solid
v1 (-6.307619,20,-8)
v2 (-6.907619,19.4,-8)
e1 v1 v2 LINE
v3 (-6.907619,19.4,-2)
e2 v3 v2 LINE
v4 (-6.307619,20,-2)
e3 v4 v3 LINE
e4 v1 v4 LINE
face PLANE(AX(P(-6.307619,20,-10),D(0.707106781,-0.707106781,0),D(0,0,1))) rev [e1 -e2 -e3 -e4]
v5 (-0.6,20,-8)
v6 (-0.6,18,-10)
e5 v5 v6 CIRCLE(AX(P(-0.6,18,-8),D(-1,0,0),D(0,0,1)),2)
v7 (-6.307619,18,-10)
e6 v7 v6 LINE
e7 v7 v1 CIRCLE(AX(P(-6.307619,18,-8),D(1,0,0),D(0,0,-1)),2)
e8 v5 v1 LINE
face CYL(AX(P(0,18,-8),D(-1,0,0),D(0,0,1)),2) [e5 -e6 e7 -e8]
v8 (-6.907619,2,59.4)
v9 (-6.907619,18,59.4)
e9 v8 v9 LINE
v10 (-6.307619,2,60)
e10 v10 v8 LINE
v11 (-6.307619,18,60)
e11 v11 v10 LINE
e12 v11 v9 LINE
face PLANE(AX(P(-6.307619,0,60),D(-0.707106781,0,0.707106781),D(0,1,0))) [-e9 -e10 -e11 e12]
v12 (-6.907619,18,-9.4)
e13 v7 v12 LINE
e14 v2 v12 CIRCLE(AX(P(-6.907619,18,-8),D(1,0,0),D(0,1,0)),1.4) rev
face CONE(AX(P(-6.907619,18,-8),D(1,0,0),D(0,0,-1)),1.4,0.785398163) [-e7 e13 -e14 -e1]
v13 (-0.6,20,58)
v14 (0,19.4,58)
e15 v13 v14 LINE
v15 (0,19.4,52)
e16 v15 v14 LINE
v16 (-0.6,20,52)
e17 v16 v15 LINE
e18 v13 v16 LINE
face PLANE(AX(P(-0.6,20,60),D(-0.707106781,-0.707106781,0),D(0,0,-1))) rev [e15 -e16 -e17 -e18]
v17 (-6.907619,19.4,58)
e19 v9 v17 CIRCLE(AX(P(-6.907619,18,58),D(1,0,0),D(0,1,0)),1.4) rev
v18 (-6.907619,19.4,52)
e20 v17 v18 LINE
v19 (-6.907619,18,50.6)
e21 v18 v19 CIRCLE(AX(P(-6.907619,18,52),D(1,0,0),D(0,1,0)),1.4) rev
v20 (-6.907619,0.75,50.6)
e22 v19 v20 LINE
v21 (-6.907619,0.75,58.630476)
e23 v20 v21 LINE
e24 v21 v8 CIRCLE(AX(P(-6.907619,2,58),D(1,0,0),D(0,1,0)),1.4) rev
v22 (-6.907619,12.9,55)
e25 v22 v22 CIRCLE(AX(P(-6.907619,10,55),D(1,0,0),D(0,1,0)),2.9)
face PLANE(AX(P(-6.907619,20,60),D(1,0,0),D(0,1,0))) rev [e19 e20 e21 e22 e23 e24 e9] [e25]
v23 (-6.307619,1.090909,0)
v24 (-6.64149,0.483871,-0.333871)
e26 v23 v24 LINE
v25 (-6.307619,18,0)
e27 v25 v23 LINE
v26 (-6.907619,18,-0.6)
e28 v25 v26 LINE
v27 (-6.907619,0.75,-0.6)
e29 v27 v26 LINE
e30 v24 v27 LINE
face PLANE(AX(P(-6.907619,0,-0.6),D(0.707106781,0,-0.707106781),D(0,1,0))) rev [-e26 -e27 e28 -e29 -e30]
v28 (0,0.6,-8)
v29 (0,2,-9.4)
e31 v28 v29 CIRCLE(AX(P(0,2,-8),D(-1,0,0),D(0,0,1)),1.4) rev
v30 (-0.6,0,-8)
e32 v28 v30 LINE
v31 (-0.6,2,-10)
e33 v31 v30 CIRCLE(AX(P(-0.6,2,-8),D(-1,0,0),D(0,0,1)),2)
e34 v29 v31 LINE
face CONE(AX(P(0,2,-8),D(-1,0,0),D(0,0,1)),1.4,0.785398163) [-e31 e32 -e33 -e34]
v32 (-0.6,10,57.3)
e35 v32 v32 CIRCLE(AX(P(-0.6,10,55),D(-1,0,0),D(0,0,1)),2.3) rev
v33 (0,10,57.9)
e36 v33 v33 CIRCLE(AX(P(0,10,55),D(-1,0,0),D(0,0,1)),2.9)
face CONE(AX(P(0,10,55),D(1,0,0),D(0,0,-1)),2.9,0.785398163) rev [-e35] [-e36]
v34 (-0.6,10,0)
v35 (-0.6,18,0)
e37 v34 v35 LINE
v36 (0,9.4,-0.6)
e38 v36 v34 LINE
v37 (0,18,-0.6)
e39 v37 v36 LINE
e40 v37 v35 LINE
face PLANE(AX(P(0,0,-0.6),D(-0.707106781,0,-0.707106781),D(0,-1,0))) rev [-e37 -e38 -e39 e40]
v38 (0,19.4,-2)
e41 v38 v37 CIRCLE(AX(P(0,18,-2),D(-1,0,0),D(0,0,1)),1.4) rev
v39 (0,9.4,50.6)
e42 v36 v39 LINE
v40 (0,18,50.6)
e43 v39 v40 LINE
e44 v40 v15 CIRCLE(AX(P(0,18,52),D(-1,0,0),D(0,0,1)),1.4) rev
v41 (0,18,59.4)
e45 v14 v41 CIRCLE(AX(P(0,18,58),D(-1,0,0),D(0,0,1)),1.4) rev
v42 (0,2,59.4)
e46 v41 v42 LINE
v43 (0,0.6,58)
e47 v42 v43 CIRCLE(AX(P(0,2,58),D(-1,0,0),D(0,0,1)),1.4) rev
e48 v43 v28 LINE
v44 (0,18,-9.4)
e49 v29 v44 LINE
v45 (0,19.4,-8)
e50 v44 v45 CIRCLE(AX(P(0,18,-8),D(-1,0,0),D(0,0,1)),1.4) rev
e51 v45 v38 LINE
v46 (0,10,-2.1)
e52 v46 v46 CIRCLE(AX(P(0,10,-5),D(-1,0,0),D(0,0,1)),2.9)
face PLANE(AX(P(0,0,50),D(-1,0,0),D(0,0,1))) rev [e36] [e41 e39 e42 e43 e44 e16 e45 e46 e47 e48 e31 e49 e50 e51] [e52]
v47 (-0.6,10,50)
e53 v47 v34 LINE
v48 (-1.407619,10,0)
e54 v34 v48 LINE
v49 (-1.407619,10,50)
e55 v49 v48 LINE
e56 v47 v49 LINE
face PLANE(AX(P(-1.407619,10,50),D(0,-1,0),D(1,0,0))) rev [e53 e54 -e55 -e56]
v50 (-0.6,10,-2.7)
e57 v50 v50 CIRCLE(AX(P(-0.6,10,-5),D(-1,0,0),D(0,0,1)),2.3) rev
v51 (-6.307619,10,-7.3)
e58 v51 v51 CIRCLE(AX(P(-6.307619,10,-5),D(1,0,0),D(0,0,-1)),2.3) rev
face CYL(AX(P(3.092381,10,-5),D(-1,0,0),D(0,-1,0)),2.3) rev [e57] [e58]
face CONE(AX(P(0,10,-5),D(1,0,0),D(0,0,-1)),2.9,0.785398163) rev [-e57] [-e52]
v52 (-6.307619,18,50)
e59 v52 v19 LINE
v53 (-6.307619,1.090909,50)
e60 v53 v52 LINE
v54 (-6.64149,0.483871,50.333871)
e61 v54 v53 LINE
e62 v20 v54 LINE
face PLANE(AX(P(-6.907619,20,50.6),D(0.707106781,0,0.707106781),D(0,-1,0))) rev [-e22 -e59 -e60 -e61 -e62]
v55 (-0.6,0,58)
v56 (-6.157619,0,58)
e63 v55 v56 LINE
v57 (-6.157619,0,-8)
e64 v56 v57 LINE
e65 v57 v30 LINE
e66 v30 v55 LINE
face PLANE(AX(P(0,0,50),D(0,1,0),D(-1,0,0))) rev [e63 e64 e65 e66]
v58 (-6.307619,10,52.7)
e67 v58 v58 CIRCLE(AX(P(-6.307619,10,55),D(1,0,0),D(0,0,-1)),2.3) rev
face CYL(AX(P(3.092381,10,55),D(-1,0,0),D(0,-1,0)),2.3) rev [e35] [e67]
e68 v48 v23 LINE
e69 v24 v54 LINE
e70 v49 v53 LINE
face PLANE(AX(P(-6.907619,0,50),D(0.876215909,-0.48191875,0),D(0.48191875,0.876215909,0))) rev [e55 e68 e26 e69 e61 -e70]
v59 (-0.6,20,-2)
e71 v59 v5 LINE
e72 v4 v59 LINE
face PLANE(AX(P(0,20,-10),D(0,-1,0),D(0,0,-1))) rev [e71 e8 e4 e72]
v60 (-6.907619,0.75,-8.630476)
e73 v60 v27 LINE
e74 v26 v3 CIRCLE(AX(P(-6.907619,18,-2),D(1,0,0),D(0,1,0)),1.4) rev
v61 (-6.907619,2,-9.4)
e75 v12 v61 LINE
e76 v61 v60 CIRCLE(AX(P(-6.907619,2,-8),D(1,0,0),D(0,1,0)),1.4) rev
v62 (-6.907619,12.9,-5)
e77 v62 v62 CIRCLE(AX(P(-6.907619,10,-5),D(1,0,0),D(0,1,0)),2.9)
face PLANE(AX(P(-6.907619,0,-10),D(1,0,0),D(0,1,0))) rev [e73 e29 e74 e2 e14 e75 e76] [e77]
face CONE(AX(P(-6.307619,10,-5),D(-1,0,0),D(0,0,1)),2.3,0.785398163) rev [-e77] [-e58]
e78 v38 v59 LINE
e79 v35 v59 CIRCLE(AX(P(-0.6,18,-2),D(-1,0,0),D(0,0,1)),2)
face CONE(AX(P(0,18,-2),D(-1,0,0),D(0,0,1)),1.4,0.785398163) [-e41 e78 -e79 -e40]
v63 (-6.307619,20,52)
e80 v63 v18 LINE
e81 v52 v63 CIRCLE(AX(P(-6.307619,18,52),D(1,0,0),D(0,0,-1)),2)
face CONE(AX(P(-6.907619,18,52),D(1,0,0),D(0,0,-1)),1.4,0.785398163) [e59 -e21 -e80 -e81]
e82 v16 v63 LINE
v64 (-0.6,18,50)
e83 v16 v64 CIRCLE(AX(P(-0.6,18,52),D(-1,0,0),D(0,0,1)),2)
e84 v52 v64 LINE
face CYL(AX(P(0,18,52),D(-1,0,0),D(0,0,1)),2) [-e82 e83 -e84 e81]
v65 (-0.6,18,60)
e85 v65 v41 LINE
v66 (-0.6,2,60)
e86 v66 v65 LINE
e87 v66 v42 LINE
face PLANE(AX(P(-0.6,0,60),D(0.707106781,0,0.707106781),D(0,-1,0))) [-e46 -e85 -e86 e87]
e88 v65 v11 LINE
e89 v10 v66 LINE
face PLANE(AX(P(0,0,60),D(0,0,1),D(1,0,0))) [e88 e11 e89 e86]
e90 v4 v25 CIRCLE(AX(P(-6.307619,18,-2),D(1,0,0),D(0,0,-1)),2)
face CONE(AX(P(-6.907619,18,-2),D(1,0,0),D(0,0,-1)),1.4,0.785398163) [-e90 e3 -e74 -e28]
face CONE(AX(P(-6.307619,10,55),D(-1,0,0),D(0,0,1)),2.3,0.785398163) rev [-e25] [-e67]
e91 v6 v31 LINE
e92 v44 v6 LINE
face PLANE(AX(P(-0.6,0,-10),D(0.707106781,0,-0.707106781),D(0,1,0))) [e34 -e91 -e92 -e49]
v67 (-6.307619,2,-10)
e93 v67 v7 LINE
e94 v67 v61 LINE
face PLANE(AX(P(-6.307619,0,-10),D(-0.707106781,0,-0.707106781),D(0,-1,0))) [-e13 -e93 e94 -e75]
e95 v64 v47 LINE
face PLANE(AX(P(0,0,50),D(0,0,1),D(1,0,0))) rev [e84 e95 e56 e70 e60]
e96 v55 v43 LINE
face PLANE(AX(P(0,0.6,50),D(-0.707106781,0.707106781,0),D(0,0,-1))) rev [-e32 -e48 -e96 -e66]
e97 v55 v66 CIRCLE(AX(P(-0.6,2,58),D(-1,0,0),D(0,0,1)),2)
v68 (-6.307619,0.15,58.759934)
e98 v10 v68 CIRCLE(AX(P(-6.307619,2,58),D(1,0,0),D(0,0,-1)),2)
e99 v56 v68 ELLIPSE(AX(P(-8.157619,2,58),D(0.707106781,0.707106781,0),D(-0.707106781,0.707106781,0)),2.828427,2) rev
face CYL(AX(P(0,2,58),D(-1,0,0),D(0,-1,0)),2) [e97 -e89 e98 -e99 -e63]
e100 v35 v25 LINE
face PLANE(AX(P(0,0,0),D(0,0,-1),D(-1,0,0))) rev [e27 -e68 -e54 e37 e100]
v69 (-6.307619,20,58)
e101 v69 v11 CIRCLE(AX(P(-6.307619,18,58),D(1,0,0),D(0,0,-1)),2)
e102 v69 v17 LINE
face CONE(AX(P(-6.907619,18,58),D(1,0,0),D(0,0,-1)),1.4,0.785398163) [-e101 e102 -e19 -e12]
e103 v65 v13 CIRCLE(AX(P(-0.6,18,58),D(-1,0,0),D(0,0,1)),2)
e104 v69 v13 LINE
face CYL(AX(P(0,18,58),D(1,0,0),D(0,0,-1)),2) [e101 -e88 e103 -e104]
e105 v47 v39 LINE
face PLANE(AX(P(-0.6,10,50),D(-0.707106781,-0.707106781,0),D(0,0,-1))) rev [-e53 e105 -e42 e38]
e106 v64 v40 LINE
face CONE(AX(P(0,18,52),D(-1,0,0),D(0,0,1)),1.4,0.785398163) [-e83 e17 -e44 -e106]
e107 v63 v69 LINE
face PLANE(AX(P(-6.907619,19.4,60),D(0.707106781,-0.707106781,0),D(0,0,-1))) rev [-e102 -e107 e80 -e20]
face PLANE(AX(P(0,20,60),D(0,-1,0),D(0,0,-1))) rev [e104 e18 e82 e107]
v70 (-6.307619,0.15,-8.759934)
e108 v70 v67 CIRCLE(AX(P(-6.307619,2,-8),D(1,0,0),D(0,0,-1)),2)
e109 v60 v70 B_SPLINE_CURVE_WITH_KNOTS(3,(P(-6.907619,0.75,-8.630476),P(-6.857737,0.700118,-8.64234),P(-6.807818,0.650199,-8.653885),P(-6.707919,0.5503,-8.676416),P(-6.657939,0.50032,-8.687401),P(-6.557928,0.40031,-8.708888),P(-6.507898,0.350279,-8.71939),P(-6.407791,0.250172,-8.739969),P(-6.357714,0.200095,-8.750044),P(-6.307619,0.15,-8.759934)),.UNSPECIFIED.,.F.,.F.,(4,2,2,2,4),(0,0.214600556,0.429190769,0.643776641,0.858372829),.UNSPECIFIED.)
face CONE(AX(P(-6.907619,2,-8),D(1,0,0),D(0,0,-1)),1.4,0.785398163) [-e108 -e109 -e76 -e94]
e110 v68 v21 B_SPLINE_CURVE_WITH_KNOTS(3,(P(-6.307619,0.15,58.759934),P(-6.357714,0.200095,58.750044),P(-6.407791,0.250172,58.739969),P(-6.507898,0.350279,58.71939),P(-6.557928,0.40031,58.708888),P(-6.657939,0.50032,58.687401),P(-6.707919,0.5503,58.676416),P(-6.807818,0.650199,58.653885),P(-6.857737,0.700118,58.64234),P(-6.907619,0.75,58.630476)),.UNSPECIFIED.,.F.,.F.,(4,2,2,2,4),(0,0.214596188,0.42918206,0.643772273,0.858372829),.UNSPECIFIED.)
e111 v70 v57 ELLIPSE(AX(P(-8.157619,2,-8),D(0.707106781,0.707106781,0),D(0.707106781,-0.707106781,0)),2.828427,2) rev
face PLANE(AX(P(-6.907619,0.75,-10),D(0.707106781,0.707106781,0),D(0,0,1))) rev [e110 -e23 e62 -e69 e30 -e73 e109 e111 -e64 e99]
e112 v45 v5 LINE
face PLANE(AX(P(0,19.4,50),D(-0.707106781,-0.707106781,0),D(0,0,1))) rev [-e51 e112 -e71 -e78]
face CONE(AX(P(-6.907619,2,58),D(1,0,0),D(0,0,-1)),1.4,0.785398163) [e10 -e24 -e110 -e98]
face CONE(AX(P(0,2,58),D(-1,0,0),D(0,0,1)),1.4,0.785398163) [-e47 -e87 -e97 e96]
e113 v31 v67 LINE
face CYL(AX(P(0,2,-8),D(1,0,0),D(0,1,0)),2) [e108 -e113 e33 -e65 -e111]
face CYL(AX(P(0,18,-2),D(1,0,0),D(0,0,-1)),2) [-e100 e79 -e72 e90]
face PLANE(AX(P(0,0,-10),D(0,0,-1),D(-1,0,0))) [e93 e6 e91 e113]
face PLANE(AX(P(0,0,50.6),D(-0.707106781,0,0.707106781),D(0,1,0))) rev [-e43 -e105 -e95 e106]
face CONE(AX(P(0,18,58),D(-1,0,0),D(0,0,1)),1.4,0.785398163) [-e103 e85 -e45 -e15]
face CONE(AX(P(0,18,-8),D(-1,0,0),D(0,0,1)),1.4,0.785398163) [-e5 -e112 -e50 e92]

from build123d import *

# Parameters (mm, degrees)
AUFSATZ_LINEAR_AUSTRAGEN1_DEPTH = 50
SKIZZE2_W                       = 6.907618634
SKIZZE2_H                       = 20
AUFSATZ_LINEAR_AUSTRAGEN2_DEPTH = 10
AUFSATZ_LINEAR_START            = -50
SKIZZE2_2_W                     = 6.907618634
SKIZZE2_2_H                     = 20
AUFSATZ_LINEAR_AUSTRAGEN3_DEPTH = 10
FASE1_SIZE                      = 0.75
FASE1_SIZE_2                    = 0.55222801
SKIZZE3_R                       = 2.3
SCHNITT_LINEAR_AUSTRAGEN1_DEPTH = 10
VERRUNDUNG1_R                   = 2
FASE2_SIZE                      = 0.6


with BuildPart() as part:
    # Skizze1 → Aufsatz-Linear austragen1 (new body)
    with BuildSketch(Plane.XY):
        Polygon((0, 0), (0, 10), (-1.407618634, 10), (-6.907618634, 0), align=None)
    extrude(amount=AUFSATZ_LINEAR_AUSTRAGEN1_DEPTH)

    # Skizze2 → Aufsatz-Linear austragen2 (add)
    with BuildSketch(Plane.XY.offset(50)):
        with Locations((-3.453809317, 10)):
            Rectangle(SKIZZE2_W, SKIZZE2_H)
    extrude(amount=AUFSATZ_LINEAR_AUSTRAGEN2_DEPTH)

    # Skizze2<2> → Aufsatz-Linear austragen3 (add)
    with BuildSketch(Plane.XY.offset(50).offset(AUFSATZ_LINEAR_START)):
        with Locations((-3.453809317, 10)):
            Rectangle(SKIZZE2_2_W, SKIZZE2_2_H)
    extrude(amount=-AUFSATZ_LINEAR_AUSTRAGEN3_DEPTH)

    # Fase1
    # the kernel refuses this chamfer: 0.75, 0.55222801 mm, written as the material it takes off along each edge
    with BuildSketch(Plane(origin=(-6.907618634, 0, 50), x_dir=(-0.027495876610586778, 0.9996219169112968, 0), z_dir=(0, 0, 1))) as fase1_piece_1:
        Polygon((FASE1_SIZE * 0.999621916911, -FASE1_SIZE * 0.0274958766106), (-FASE1_SIZE * 0.0274958766106, -FASE1_SIZE * 0.999621916911), (0, 0), align=None)
    extrude(amount=11.928762241, mode=Mode.SUBTRACT)
    with BuildSketch(Plane(origin=(-6.907618634, 0, 0), x_dir=(-0.027495876610586778, 0.9996219169112968, 0), z_dir=(0, 0, -1))) as fase1_piece_2:
        Polygon((FASE1_SIZE * 0.999621916911, FASE1_SIZE * 0.0274958766106), (-FASE1_SIZE * 0.0274958766106, FASE1_SIZE * 0.999621916911), (0, 0), align=None)
    extrude(amount=11.928762241, mode=Mode.SUBTRACT)
    with BuildSketch(Plane(origin=(-6.907618634, 0, 0), x_dir=(0.436311778339264, 0.8997955501570503, 0), z_dir=(0, 0, 1))) as fase1_piece_3:
        Polygon((FASE1_SIZE_2 * 0.998682002669, -FASE1_SIZE_2 * 0.0513250252757), (FASE1_SIZE * 0.436311778339, -FASE1_SIZE * 0.899795550157), (0, 0), align=None)
    extrude(amount=50, mode=Mode.SUBTRACT)

    # Skizze3 → Schnitt-Linear austragen1 (cut)
    with BuildSketch(Plane.ZY.offset(6.907618634)):
        with Locations(Location((-5, 10, 0), (0, 0, 270))):
            Circle(SKIZZE3_R)
        with Locations((55, 10)):
            Circle(SKIZZE3_R)
    extrude(amount=-SCHNITT_LINEAR_AUSTRAGEN1_DEPTH, mode=Mode.SUBTRACT)

    # Verrundung1
    verrundung1_edges = [part.edges().sort_by_distance(p)[0] for p in [
        (-3.078809317, 0, -10),
        (-3.078809317, 0, 60),
        (-3.453809317, 20, 60),
        (-3.453809317, 20, 50),
        (-3.453809317, 20, 0),
        (-3.453809317, 20, -10),
    ]]
    fillet(verrundung1_edges, radius=VERRUNDUNG1_R)

    # Fase2
    fase2_edges = [part.edges().sort_by_distance(p)[0] for p in [
        (0, 0, 25),
        (0, 0.585786438, 59.414213562),
        (0, 0.585786438, -9.414213562),
        (0, 10, 60),
        (0, 10, -10),
        (0, 19.414213562, 59.414213562),
        (0, 19.414213562, -9.414213562),
        (0, 20, 55),
        (0, 20, -5),
        (0, 19.414213562, 50.585786438),
        (0, 19.414213562, -0.585786438),
        (0, 14, 50),
        (0, 14, 0),
    ]]
    chamfer(fase2_edges, length=FASE2_SIZE)
    fase2_2_edges = [part.edges().sort_by_distance(p)[0] for p in [
        (0, 10, 25),
    ]]
    chamfer(fase2_2_edges, length=FASE2_SIZE)
    fase2_3_edges = [part.edges().sort_by_distance(p)[0] for p in [
        (0, 10, 52.7),
    ]]
    chamfer(fase2_3_edges, length=FASE2_SIZE)
    fase2_4_edges = [part.edges().sort_by_distance(p)[0] for p in [
        (0, 12.3, -5),
    ]]
    chamfer(fase2_4_edges, length=FASE2_SIZE)
    fase2_5_edges = [part.edges().sort_by_distance(p)[0] for p in [
        (-6.907618634, 1.337617557, 59.887127314),
        (-6.907618634, 10, 60),
        (-6.907618634, 19.414213562, 59.414213562),
        (-6.907618634, 20, 55),
        (-6.907618634, 19.414213562, 50.585786438),
        (-6.907618634, 9.375, 50),
    ]]
    chamfer(fase2_5_edges, length=FASE2_SIZE)
    fase2_6_edges = [part.edges().sort_by_distance(p)[0] for p in [
        (-6.907618634, 1.337617557, -9.887127314),
        (-6.907618634, 10, -10),
        (-6.907618634, 19.414213562, -9.414213562),
        (-6.907618634, 20, -5),
        (-6.907618634, 19.414213562, -0.585786438),
        (-6.907618634, 9.375, 0),
    ]]
    chamfer(fase2_6_edges, length=FASE2_SIZE)
    fase2_7_edges = [part.edges().sort_by_distance(p)[0] for p in [
        (-6.907618634, 10, 52.7),
    ]]
    chamfer(fase2_7_edges, length=FASE2_SIZE)
    fase2_8_edges = [part.edges().sort_by_distance(p)[0] for p in [
        (-6.907618634, 12.3, -5),
    ]]
    chamfer(fase2_8_edges, length=FASE2_SIZE)


solid = part.part
